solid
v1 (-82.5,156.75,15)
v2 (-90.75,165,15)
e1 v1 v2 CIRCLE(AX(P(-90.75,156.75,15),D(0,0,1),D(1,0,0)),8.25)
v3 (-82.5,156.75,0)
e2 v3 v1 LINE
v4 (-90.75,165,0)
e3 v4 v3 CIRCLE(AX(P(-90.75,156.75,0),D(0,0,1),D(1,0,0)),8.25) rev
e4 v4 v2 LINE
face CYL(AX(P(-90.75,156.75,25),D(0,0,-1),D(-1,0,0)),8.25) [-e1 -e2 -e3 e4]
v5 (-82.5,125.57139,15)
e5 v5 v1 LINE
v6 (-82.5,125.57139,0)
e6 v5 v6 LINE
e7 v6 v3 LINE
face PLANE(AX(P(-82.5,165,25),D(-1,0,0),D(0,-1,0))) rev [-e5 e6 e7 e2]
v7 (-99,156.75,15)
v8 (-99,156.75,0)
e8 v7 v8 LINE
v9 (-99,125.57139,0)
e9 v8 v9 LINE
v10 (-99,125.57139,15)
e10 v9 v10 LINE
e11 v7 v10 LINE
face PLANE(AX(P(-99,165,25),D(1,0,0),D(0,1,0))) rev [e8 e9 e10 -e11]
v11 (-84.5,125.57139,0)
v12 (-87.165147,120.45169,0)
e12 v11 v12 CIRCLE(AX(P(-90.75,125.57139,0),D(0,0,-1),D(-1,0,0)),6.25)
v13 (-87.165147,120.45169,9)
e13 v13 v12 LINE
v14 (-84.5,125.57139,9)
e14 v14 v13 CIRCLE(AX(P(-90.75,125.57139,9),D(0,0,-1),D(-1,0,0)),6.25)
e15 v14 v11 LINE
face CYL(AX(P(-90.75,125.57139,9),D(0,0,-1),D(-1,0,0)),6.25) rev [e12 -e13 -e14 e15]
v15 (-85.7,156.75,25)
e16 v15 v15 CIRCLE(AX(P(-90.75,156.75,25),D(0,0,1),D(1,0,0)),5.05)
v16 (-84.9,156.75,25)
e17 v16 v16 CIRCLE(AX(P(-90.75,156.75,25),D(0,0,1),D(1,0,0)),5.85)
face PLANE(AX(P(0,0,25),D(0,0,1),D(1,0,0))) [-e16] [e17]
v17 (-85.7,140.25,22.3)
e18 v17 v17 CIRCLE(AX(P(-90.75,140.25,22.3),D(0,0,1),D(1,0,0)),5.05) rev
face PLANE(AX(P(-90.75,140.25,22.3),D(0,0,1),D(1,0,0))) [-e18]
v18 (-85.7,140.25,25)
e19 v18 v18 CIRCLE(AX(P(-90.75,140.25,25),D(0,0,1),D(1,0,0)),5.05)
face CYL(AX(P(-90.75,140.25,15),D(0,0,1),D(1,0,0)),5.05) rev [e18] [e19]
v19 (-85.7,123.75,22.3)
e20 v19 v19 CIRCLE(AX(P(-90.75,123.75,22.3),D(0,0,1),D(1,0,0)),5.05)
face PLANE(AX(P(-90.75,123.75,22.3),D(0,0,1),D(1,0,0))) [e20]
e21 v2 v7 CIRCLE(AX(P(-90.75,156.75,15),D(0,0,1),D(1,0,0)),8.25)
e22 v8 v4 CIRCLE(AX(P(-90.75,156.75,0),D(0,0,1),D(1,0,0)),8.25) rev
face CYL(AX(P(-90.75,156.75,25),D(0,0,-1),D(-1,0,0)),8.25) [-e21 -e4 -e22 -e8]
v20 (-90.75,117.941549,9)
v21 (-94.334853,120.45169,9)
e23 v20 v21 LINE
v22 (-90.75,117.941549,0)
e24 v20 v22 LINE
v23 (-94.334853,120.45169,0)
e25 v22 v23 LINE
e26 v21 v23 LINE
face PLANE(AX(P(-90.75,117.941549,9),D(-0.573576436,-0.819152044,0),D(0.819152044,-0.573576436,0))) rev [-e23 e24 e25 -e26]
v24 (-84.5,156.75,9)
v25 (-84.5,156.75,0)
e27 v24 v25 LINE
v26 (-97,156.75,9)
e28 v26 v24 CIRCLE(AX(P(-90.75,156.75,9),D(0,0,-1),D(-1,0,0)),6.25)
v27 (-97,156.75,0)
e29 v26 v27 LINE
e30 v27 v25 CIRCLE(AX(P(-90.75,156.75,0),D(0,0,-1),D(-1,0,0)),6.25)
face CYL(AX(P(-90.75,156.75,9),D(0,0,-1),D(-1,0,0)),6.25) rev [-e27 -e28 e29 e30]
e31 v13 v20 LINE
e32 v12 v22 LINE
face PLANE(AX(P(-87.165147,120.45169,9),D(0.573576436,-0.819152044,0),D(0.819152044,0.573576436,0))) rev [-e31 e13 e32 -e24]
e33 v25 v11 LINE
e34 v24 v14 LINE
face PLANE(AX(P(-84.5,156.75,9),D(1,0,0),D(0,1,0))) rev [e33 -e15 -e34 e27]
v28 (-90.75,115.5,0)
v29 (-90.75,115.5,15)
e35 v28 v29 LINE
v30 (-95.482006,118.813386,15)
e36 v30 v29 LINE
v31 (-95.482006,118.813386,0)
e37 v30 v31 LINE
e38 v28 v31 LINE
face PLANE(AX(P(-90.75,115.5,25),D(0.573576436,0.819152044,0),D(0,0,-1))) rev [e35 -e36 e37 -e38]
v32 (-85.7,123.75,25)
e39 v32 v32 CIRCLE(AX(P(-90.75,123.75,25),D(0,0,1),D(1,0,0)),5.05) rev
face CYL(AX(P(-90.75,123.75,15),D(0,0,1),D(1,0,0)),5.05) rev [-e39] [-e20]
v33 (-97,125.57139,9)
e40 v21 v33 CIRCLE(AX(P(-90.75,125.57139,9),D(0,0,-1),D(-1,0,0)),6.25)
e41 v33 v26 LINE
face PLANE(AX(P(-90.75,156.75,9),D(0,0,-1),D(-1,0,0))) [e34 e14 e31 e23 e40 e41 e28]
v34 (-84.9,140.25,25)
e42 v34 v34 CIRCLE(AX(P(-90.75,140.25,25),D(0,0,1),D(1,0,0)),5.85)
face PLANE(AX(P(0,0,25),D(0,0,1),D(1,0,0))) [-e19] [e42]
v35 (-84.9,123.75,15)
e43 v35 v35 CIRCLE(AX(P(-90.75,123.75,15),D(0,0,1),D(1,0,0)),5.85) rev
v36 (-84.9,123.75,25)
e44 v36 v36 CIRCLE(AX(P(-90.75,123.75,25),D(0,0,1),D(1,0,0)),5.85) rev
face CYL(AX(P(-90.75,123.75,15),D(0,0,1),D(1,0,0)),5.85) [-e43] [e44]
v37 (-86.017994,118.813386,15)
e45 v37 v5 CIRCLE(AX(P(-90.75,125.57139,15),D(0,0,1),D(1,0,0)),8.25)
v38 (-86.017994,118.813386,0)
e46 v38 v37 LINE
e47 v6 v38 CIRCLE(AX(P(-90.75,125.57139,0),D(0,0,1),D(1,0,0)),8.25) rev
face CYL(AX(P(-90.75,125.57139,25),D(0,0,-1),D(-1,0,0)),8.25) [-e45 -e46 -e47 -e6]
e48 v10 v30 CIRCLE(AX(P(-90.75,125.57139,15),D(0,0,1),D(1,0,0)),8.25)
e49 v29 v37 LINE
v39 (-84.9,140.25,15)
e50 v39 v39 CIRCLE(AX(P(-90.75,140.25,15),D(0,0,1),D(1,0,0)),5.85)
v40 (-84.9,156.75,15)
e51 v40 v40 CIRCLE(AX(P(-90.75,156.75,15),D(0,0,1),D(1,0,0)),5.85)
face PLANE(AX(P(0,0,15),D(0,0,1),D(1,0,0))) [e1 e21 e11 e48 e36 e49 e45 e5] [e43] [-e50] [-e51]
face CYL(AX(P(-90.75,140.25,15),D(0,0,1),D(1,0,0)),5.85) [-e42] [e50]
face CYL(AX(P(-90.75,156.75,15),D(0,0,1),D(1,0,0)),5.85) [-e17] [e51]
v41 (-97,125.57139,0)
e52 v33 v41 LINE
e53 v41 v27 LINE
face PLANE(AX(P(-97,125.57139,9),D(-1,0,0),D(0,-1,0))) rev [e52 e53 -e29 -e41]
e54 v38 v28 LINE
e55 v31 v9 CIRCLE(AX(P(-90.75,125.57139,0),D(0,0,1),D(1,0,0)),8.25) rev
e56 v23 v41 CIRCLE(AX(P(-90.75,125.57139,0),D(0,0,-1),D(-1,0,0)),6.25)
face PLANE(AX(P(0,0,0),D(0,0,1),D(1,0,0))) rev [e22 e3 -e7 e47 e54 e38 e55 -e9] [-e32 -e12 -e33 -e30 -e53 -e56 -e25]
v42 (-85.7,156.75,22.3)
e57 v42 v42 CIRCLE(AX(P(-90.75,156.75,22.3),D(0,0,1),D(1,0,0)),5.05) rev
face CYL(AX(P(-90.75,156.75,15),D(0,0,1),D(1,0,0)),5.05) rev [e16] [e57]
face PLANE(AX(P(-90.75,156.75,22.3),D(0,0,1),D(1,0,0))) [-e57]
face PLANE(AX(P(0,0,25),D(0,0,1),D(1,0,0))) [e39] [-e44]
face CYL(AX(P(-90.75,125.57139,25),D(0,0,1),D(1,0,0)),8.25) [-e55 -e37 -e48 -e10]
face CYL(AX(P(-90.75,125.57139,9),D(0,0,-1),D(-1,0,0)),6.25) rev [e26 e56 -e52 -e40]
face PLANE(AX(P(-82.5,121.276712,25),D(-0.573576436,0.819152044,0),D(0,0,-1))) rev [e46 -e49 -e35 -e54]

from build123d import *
from OCP.BRepFilletAPI import BRepFilletAPI_MakeChamfer

# Parameters (mm, degrees)
SKETCH1_W                       = 16.5
SKETCH1_H                       = 49.5
BOSS_EXTRUDE1_DEPTH             = 25
SKETCH2_R                       = 5.85
SKETCH2_R_2                     = 5.05
CUT_EXTRUDE1_DEPTH              = 10
FILLET5_R                       = 8.25
CHAMFER1_SIZE                   = 5.77671219
CHAMFER1_SIZE_2                 = 8.25
FILLET6_R                       = 8.25
SKETCH4_R                       = 5.1
BOSS_EXTRUDE2_DEPTH             = 7.3
SCHNITT_LINEAR_AUSTRAGEN1_DEPTH = 9


with BuildPart() as part:
    # Sketch1 → Boss-Extrude1 (new body)
    with BuildSketch(Plane.XY):
        with Locations((-90.75, 140.25)):
            Rectangle(SKETCH1_W, SKETCH1_H)
    extrude(amount=BOSS_EXTRUDE1_DEPTH)

    # Sketch2 → Cut-Extrude1 (cut)
    # profile 1 of 8: a face of its own
    with BuildSketch(Plane.XY.offset(25)):
        with BuildLine():
            ThreePointArc((-96.6, 140.25), (-90.75, 146.1), (-84.9, 140.25))
            Line((-84.9, 140.25), (-82.5, 140.25))
            Line((-82.5, 140.25), (-82.5, 165))
            Line((-82.5, 165), (-99, 165))
            Line((-99, 165), (-99, 140.25))
            Line((-99, 140.25), (-96.6, 140.25))
        make_face()
        with Locations((-90.75, 156.75)):
            Circle(SKETCH2_R, mode=Mode.SUBTRACT)
    # profile 2 of 8: a face of its own
    with BuildSketch(Plane.XY.offset(25)):
        with BuildLine():
            Line((-82.5, 140.25), (-84.9, 140.25))
            ThreePointArc((-84.9, 140.25), (-90.75, 134.4), (-96.6, 140.25))
            Line((-96.6, 140.25), (-99, 140.25))
            Line((-99, 140.25), (-99, 115.5))
            Line((-99, 115.5), (-82.5, 115.5))
            Line((-82.5, 115.5), (-82.5, 140.25))
        make_face()
        with Locations((-90.75, 123.75)):
            Circle(SKETCH2_R, mode=Mode.SUBTRACT)
    # profile 3 of 8: a face of its own
    with BuildSketch(Plane.XY.offset(25)):
        with BuildLine():
            ThreePointArc((-95.8, 140.25), (-90.75, 135.2), (-85.7, 140.25))
            Line((-85.7, 140.25), (-95.8, 140.25))
        make_face()
    # profile 4 of 8: a face of its own
    with BuildSketch(Plane.XY.offset(25)):
        with BuildLine():
            Line((-95.8, 140.25), (-85.7, 140.25))
            ThreePointArc((-85.7, 140.25), (-90.75, 145.3), (-95.8, 140.25))
        make_face()
    # profile 5 of 8: a face of its own
    with BuildSketch(Plane.XY.offset(25)):
        with BuildLine():
            ThreePointArc((-95.8, 140.25), (-90.75, 135.2), (-85.7, 140.25))
            Line((-85.7, 140.25), (-95.8, 140.25))
        make_face()
    # profile 6 of 8: a face of its own
    with BuildSketch(Plane.XY.offset(25)):
        with BuildLine():
            Line((-95.8, 140.25), (-85.7, 140.25))
            ThreePointArc((-85.7, 140.25), (-90.75, 145.3), (-95.8, 140.25))
        make_face()
    # profile 7 of 8: a face of its own
    with BuildSketch(Plane.XY.offset(25)):
        with Locations((-90.75, 123.75)):
            Circle(SKETCH2_R_2)
    # profile 8 of 8: a face of its own
    with BuildSketch(Plane.XY.offset(25)):
        with Locations((-90.75, 156.75)):
            Circle(SKETCH2_R_2)
    extrude(amount=-CUT_EXTRUDE1_DEPTH, mode=Mode.SUBTRACT)

    # Fillet5
    fillet5_edges = [part.edges().sort_by_distance(p)[0] for p in [
        (-82.5, 165, 7.5),
        (-99, 165, 7.5),
    ]]
    fillet(fillet5_edges, radius=FILLET5_R - 0.0001)  # a hair under: the kernel refuses the full size

    # Chamfer1
    chamfer1_edges_1 = [part.edges().sort_by_distance(p)[0] for p in [
        (-99, 115.5, 7.5),
    ]]
    chamfer1_side_1 = [part.faces().sort_by_distance(p)[0] for p in [
        (-99, 115.615534244, 7.5),
    ]]
    chamfer1_edges_2 = [part.edges().sort_by_distance(p)[0] for p in [
        (-82.5, 115.5, 7.5),
    ]]
    chamfer1_side_2 = [part.faces().sort_by_distance(p)[0] for p in [
        (-82.5, 115.615534244, 7.5),
    ]]
    chamfer1 = BRepFilletAPI_MakeChamfer(part.part.solid().wrapped)
    for e in chamfer1_edges_1:
        chamfer1.Add(CHAMFER1_SIZE - 0.0001, CHAMFER1_SIZE_2 - 0.0001, e.wrapped, chamfer1_side_1[0].wrapped)
    for e in chamfer1_edges_2:
        chamfer1.Add(CHAMFER1_SIZE - 0.0001, CHAMFER1_SIZE_2 - 0.0001, e.wrapped, chamfer1_side_2[0].wrapped)
    add(Compound.cast(chamfer1.Shape()), mode=Mode.REPLACE)  # a hair under: the kernel refuses the full size

    # Fillet6
    fillet6_edges = [part.edges().sort_by_distance(p)[0] for p in [
        (-99, 121.27661219, 7.5),
        (-82.5, 121.27661219, 7.5),
    ]]
    fillet(fillet6_edges, radius=FILLET6_R)

    # Sketch4 → Boss-Extrude2 (add)
    with BuildSketch(Plane.XY.offset(15)):
        with Locations((-90.75, 156.75)):
            Circle(SKETCH4_R)
        with Locations((-90.75, 140.25)):
            Circle(SKETCH4_R)
        with Locations((-90.75, 123.75)):
            Circle(SKETCH4_R)
    extrude(amount=BOSS_EXTRUDE2_DEPTH)

    # Skizze2 → Schnitt-Linear austragen1 (cut)
    with BuildSketch(Plane(origin=(0, 0, 0), x_dir=(-1, 0, 0), z_dir=(0, 0, -1))):
        with BuildLine():
            Line((84.5, 156.75), (84.5, 125.571390357))
            ThreePointArc((84.5, 125.571390357), (85.206182293, 122.685461525), (87.165147273, 120.45169008))
            Line((87.165147273, 120.45169008), (90.75, 117.941549178))
            Line((90.75, 117.941549178), (94.334852727, 120.45169008))
            ThreePointArc((94.334852727, 120.45169008), (96.293817707, 122.685461525), (97, 125.571390357))
            Line((97, 125.571390357), (97, 156.75))
            ThreePointArc((97, 156.75), (95.169417382, 161.169417382), (90.75, 163))
            ThreePointArc((90.75, 163), (86.330582618, 161.169417382), (84.5, 156.75))
        make_face()
    extrude(amount=-SCHNITT_LINEAR_AUSTRAGEN1_DEPTH, mode=Mode.SUBTRACT)


solid = part.part
